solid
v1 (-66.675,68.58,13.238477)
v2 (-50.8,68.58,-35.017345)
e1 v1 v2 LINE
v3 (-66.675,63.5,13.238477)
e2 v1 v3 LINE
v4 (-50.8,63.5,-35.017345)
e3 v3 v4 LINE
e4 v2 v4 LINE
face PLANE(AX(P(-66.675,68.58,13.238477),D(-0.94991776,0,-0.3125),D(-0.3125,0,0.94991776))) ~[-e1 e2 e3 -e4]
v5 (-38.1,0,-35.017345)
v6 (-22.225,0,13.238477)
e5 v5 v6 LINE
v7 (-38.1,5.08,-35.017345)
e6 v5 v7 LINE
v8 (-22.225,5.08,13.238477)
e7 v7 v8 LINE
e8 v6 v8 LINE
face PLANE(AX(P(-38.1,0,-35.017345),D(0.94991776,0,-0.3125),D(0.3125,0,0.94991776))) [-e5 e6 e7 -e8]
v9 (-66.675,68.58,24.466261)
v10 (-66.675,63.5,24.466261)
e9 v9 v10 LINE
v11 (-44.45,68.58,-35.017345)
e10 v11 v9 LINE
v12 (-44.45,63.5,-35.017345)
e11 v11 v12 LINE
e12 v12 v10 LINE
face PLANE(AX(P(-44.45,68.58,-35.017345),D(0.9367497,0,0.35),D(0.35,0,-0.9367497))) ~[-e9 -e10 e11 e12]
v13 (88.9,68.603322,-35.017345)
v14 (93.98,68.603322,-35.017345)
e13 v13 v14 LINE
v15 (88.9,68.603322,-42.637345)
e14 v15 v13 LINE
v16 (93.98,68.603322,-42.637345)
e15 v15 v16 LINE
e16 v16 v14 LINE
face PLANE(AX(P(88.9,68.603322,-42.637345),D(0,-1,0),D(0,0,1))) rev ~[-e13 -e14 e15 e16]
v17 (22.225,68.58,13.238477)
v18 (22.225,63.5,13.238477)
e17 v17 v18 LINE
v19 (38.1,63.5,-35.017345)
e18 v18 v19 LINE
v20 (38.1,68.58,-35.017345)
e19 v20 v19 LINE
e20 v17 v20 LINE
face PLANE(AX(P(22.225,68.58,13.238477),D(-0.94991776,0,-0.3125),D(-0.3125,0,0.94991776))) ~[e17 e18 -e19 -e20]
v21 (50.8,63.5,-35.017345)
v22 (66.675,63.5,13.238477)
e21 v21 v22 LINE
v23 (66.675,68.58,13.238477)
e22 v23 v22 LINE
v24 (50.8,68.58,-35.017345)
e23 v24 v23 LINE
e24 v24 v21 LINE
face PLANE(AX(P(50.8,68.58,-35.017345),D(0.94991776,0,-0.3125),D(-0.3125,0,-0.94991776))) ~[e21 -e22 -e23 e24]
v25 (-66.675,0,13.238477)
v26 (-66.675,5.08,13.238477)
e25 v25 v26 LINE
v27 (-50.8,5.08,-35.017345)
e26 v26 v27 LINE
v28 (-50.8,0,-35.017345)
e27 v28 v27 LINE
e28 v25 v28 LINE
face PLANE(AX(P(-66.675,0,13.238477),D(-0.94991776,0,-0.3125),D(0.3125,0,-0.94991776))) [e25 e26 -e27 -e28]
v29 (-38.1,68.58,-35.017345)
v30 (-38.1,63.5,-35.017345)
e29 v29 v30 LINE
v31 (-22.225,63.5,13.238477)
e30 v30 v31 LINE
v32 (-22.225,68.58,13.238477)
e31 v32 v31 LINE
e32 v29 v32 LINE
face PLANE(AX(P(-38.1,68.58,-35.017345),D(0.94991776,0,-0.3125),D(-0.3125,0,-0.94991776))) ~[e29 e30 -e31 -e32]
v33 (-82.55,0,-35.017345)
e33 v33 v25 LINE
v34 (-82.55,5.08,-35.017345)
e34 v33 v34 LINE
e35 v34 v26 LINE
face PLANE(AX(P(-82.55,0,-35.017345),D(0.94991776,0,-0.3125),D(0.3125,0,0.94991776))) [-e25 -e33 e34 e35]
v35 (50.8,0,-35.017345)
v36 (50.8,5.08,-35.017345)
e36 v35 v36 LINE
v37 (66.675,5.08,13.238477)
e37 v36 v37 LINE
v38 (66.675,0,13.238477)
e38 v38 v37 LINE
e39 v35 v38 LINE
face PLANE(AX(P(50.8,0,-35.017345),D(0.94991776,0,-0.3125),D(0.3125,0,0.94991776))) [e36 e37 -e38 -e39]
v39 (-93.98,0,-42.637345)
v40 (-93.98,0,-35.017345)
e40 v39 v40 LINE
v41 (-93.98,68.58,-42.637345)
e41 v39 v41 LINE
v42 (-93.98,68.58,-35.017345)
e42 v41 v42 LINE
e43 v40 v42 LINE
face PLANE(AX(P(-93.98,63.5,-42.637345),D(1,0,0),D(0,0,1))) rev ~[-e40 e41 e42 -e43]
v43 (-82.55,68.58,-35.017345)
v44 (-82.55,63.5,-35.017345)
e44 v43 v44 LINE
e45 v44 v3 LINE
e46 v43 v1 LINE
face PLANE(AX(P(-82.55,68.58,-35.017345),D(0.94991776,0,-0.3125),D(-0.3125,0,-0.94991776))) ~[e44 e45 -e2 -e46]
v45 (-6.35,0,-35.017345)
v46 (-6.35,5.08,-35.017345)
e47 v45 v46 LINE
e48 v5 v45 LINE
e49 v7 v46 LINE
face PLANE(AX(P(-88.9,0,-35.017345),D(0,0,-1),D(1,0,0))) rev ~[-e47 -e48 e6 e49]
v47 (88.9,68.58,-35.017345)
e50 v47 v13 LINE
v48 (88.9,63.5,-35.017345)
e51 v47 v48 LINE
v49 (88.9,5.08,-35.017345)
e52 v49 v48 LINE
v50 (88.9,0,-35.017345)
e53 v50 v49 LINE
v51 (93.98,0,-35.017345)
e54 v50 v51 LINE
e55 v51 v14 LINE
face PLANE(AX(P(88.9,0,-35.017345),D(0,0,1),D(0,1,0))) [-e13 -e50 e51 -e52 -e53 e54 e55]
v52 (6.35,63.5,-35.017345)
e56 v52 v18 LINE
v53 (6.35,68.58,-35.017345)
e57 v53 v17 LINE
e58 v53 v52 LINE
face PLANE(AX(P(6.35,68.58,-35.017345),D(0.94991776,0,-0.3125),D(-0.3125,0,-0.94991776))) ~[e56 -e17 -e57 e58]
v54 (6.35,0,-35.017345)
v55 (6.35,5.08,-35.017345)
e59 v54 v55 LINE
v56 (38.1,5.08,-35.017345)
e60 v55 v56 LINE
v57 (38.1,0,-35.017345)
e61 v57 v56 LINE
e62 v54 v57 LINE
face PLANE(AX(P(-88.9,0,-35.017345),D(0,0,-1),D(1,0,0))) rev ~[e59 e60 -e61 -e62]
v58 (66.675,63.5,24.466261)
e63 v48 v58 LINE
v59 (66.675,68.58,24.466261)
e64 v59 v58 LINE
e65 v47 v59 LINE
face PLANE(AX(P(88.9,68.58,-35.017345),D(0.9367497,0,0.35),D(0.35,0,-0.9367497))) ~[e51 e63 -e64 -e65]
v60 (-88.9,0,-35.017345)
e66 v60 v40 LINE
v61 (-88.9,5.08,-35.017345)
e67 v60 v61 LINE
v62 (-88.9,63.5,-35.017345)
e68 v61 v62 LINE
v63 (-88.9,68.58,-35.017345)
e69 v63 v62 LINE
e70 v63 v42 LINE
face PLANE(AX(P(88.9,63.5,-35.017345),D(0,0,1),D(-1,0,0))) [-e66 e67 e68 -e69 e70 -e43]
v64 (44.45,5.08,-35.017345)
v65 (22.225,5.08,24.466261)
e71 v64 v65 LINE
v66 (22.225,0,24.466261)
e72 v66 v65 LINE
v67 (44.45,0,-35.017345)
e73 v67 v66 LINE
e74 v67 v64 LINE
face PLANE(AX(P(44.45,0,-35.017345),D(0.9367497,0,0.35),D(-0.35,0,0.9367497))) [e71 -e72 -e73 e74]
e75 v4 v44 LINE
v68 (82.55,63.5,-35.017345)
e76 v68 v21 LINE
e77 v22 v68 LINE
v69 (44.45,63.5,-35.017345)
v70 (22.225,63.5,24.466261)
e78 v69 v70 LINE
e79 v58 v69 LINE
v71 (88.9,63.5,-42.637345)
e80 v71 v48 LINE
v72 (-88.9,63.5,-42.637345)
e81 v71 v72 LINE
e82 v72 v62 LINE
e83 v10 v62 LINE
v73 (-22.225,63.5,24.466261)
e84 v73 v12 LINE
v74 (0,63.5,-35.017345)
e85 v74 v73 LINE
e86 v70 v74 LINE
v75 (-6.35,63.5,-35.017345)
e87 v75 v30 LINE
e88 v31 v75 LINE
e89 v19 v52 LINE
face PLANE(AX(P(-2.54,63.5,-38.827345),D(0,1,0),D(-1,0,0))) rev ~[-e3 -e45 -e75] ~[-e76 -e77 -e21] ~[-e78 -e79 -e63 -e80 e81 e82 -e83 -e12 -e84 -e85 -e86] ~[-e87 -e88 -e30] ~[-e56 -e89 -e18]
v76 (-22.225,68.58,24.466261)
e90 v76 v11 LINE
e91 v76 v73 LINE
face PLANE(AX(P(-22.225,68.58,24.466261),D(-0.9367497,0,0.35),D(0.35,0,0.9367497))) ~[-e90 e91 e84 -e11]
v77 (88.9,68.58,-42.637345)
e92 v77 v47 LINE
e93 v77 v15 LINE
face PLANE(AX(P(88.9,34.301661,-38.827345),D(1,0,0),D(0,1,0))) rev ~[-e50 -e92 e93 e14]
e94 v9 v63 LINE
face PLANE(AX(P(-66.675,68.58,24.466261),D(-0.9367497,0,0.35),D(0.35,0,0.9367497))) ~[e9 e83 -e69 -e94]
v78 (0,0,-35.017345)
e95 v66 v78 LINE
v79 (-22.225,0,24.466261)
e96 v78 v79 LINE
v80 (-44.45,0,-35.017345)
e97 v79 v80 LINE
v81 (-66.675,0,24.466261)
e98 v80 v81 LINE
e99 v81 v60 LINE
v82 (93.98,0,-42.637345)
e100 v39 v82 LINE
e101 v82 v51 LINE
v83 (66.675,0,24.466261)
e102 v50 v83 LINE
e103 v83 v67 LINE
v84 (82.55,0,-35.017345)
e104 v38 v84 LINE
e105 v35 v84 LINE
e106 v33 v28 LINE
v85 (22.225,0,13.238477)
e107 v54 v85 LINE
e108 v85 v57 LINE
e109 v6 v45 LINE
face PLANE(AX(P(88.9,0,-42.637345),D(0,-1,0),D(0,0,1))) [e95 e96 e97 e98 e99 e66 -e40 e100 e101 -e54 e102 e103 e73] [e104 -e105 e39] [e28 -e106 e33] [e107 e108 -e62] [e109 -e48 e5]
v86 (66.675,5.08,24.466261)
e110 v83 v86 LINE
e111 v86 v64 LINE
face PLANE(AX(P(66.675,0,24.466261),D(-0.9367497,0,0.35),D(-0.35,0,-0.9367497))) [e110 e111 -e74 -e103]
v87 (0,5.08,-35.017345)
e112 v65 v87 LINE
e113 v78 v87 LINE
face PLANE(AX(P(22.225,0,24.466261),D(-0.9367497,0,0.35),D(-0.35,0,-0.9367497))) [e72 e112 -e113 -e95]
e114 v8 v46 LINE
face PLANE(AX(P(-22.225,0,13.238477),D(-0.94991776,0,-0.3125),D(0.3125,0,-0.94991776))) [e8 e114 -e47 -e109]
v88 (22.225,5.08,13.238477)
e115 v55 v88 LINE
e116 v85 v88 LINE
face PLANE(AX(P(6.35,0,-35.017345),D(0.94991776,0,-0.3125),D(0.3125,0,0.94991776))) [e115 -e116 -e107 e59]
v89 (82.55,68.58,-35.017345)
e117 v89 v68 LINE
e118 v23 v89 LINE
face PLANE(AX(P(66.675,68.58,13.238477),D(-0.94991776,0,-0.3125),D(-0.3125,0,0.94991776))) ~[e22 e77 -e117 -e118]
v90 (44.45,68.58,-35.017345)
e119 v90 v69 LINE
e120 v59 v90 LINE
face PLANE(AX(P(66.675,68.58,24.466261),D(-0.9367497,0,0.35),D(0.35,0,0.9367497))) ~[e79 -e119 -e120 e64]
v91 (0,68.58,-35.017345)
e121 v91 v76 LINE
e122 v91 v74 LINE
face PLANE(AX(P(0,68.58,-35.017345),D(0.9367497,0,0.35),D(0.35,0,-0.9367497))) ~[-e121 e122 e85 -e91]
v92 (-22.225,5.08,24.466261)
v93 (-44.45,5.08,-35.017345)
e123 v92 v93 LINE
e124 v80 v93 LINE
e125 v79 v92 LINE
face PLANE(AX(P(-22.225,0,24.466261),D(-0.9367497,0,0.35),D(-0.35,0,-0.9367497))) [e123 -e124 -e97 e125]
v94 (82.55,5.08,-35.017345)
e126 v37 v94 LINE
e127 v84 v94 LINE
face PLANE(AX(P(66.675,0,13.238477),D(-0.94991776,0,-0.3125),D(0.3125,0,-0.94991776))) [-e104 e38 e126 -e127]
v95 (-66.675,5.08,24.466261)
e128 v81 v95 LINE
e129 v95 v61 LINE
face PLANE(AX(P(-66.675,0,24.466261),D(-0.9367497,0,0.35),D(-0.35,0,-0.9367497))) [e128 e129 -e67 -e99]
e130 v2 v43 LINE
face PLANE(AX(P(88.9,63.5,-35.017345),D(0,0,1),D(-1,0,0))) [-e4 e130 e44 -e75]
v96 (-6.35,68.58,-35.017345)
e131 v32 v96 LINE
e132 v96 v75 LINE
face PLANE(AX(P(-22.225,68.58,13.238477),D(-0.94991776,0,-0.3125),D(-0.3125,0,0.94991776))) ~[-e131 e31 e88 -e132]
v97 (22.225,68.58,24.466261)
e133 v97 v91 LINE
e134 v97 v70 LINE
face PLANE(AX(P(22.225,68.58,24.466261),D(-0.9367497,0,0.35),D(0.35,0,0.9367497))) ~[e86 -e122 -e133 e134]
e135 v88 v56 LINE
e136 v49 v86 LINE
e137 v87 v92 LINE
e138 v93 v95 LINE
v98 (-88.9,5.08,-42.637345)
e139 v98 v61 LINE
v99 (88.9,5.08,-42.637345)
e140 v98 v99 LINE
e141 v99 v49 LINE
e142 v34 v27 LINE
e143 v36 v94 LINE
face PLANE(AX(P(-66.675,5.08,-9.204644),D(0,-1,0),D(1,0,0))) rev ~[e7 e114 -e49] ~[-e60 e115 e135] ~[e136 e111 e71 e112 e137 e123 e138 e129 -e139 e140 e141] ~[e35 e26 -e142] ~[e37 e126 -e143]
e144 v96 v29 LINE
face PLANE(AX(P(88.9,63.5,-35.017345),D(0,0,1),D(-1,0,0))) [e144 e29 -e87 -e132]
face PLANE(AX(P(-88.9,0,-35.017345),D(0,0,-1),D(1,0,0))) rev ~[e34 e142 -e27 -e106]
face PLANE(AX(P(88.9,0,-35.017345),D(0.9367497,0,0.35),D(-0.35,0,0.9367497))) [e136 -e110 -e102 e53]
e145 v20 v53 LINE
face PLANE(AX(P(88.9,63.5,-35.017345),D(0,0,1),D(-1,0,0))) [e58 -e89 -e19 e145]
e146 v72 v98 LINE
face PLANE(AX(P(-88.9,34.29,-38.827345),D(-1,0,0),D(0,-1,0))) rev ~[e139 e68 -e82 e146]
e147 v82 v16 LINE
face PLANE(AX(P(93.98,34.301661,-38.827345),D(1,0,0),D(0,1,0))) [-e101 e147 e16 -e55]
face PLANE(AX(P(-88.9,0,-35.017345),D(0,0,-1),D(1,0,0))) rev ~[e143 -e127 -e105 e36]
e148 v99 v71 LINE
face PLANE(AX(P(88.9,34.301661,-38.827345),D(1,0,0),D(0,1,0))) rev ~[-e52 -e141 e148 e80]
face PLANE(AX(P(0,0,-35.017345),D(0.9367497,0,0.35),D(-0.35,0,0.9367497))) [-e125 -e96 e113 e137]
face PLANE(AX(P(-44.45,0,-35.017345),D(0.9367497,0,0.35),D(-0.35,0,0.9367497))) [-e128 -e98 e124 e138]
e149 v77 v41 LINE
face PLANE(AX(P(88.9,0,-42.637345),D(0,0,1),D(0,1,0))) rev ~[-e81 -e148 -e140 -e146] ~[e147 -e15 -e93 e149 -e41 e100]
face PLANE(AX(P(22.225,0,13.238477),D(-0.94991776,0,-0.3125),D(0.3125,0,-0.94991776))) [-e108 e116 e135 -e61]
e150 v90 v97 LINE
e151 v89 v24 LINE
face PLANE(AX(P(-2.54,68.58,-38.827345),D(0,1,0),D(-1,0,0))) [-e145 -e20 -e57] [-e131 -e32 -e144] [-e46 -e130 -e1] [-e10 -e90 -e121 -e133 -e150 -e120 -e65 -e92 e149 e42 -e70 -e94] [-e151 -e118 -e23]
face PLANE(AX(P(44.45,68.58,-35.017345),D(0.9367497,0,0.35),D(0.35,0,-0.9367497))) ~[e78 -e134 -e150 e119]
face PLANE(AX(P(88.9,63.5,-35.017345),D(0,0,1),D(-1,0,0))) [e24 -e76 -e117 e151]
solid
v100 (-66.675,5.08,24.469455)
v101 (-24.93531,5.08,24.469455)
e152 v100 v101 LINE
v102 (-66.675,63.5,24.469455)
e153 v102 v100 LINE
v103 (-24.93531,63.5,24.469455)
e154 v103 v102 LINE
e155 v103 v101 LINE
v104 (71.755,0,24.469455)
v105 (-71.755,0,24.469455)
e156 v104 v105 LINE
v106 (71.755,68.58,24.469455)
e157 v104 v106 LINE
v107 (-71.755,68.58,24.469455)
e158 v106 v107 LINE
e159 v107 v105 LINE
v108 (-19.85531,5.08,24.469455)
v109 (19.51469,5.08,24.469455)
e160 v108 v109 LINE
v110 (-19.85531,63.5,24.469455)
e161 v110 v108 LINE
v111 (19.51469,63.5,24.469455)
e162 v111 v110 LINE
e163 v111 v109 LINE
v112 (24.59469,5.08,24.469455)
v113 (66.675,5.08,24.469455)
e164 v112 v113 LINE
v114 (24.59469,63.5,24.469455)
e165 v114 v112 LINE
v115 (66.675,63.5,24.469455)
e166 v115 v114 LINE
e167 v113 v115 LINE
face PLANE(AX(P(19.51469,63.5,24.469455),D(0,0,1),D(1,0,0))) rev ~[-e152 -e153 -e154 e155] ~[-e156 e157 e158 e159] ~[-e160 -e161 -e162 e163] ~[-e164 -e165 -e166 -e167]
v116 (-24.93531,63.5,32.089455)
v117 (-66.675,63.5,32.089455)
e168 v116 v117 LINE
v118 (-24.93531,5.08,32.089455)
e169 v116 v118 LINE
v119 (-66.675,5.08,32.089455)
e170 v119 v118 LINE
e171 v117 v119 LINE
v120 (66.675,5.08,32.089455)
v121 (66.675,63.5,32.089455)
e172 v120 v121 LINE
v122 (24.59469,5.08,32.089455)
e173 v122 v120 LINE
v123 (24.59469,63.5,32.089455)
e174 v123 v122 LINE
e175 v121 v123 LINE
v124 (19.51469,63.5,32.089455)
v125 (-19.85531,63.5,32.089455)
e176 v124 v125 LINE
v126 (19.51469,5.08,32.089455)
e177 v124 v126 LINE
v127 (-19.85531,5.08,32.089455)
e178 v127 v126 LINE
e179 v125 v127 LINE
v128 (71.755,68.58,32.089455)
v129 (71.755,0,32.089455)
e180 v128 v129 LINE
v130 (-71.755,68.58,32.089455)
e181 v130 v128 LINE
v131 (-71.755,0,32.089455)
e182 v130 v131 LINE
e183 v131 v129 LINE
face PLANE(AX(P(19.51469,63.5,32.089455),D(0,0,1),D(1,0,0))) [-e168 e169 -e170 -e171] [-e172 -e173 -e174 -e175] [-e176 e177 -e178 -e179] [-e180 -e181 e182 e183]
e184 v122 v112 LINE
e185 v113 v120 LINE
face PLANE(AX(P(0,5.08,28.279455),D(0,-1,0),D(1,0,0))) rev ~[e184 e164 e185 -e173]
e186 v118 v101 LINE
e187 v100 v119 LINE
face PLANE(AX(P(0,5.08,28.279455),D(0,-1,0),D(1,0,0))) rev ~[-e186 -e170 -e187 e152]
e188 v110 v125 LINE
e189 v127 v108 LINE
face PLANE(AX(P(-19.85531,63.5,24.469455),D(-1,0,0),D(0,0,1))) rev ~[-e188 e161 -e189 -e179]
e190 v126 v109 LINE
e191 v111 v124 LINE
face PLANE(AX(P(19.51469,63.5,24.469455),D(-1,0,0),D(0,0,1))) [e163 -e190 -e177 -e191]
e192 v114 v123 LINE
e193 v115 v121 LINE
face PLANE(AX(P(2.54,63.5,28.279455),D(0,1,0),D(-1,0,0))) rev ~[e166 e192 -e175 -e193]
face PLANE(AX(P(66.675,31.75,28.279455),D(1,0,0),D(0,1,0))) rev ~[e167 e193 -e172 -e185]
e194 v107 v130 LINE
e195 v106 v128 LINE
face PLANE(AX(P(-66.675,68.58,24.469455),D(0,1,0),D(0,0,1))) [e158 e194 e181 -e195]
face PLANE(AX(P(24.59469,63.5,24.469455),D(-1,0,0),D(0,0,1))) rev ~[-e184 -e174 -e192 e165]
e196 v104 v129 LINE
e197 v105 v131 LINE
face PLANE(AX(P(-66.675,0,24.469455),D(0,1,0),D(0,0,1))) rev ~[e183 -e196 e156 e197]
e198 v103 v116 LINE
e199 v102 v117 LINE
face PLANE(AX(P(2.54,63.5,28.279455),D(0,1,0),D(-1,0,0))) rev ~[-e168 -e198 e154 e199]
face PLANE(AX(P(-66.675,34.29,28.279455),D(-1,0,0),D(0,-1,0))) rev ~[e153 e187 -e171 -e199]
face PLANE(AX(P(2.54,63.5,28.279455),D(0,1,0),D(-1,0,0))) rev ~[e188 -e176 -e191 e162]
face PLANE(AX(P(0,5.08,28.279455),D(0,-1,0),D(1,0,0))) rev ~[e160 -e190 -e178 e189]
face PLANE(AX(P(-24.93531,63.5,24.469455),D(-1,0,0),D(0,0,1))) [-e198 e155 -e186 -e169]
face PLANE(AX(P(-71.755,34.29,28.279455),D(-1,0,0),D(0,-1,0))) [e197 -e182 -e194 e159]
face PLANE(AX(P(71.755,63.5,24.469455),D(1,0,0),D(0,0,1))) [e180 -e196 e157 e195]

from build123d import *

# Parameters (mm, degrees)
F0_W      = 177.8
F0_H      = 7.62
F1_DEPTH  = 5.08
F0_W_2    = 133.35
F3_DEPTH  = 5.08
F4_W      = 58.42
F4_H      = 7.62
F4_W_2    = 5.08
F5_DEPTH  = 5.08
F6_W      = 182.88
F6_H      = 7.62
F7_DEPTH  = 5.08
F8_W      = 68.6033219099
F8_H      = 7.62
F9_DEPTH  = 5.08
F11_DEPTH = 5.08
F12_W     = 63.5
F12_H     = 7.62
F13_DEPTH = 5.08
F14_W     = 138.43
F14_H     = 7.62
F15_DEPTH = 5.08
F16_W     = 68.58
F16_H     = 7.62
F17_DEPTH = 5.08
F18_W     = 5.08
F18_H     = 7.62
F19_DEPTH = 63.5
F20_W     = 5.08
F20_H     = 7.62
F21_DEPTH = 63.5


# Not quite as in the source:
# - a pattern or mirror of a feature is missing from the dataset's text; its kind, count and spacing are read off the source's solid


with BuildPart() as f1:
    # F0 (on Front) → F1 (new body)
    with BuildSketch(Plane.XZ):
        with Locations((0, -38.8273451847)):
            Rectangle(F0_W, F0_H)
    extrude(amount=-F1_DEPTH)

    # F2 (on Front) → F3 (join)
    with BuildSketch(Plane.XZ):
        Polygon((-66.675, 24.46626075), (-88.9, -35.0173451847), (-82.55, -35.0173451847), (-66.675, 13.2384770029), (-50.8, -35.0173451847), (-44.45, -35.0173451847), align=None)
        Polygon((-22.225, 24.46626075), (-44.45, -35.0173451847), (-38.1, -35.0173451847), (-22.225, 13.2384770029), (-6.35, -35.0173451847), (0, -35.0173451847), align=None)
        Polygon((22.225, 24.46626075), (0, -35.0173451847), (6.35, -35.0173451847), (22.225, 13.2384770029), (38.1, -35.0173451847), (44.45, -35.0173451847), align=None)
        Polygon((66.675, 24.46626075), (44.45, -35.0173451847), (50.8, -35.0173451847), (66.675, 13.2384770029), (82.55, -35.0173451847), (88.9, -35.0173451847), align=None)
    f3 = extrude(amount=-F3_DEPTH)

    # F3_copies: F3 across plane
    add(f3.mirror(Plane.ZX.offset(34.29)))

    # F4 (on face) → F5 (join)
    with BuildSketch(Plane(origin=(-88.9, 0, 0), x_dir=(0, -1, 0), z_dir=(-1, 0, 0))):
        with Locations((-34.29, -38.8273451847)):
            Rectangle(F4_W, F4_H)
        with Locations((-2.54, -38.8273451847)):
            Rectangle(F4_W_2, F4_H)
    extrude(amount=F5_DEPTH)

    # F6 (on face) → F7 (join)
    with BuildSketch(Plane(origin=(0, 63.5, 0), x_dir=(-1, 0, 0), z_dir=(0, 1, 0))):
        with Locations((2.54, -38.8273451847)):
            Rectangle(F6_W, F6_H)
    extrude(amount=F7_DEPTH)

    # F8 (on face) → F9 (join)
    with BuildSketch(Plane.YZ.offset(88.9)):
        with Locations((34.301660955, -38.8273451847)):
            Rectangle(F8_W, F8_H)
    extrude(amount=F9_DEPTH)

    # F10 (on face) → F11 (join)
    with BuildSketch(Plane.XZ):
        Polygon((-66.675, 24.46626075), (-88.9, -35.0173451847), (-82.55, -35.0173451847), (-66.675, 13.2384770029), (-50.8, -35.0173451847), (-44.45, -35.0173451847), align=None)
        Polygon((-22.225, 24.46626075), (-44.45, -35.0173451847), (-38.1, -35.0173451847), (-22.225, 13.2384770029), (-6.35, -35.0173451847), (0, -35.0173451847), align=None)
        Polygon((22.225, 24.46626075), (0, -35.0173451847), (6.35, -35.0173451847), (22.225, 13.2384770029), (38.1, -35.0173451847), (44.45, -35.0173451847), align=None)
        Polygon((82.55, -35.0173451847), (88.9, -35.0173451847), (66.675, 24.46626075), (44.45, -35.0173451847), (50.8, -35.0173451847), (66.675, 13.2384770029), align=None)
    extrude(amount=-F11_DEPTH)


with BuildPart() as f1b:
    # F0 (on Front) → F1, piece 2 (new body)
    with BuildSketch(Plane.XZ):
        with Locations((0, 28.2794548153)):
            Rectangle(F0_W_2, F0_H)
    extrude(amount=-F1_DEPTH)

    # F12 (on face) → F13 (join)
    with BuildSketch(Plane.YZ.offset(66.675)):
        with Locations((31.75, 28.2794548153)):
            Rectangle(F12_W, F12_H)
    extrude(amount=F13_DEPTH)

    # F14 (on face) → F15 (join)
    with BuildSketch(Plane(origin=(0, 63.5, 0), x_dir=(-1, 0, 0), z_dir=(0, 1, 0))):
        with Locations((-2.54, 28.2794548153)):
            Rectangle(F14_W, F14_H)
    extrude(amount=F15_DEPTH)

    # F16 (on face) → F17 (join)
    with BuildSketch(Plane(origin=(-66.675, 0, 0), x_dir=(0, -1, 0), z_dir=(-1, 0, 0))):
        with Locations((-34.29, 28.2794548153)):
            Rectangle(F16_W, F16_H)
    extrude(amount=F17_DEPTH)

    # F18 (on face) → F19 (join)
    with BuildSketch(Plane.XZ.offset(-63.5)):
        with Locations((-22.3953099983, 28.2794548153)):
            Rectangle(F18_W, F18_H)
    extrude(amount=F19_DEPTH)

    # F20 (on face) → F21 (join)
    with BuildSketch(Plane.XZ.offset(-63.5)):
        with Locations((22.0546900017, 28.2794548153)):
            Rectangle(F20_W, F20_H)
    extrude(amount=F21_DEPTH)


solid = Compound([f1.part, f1b.part])
